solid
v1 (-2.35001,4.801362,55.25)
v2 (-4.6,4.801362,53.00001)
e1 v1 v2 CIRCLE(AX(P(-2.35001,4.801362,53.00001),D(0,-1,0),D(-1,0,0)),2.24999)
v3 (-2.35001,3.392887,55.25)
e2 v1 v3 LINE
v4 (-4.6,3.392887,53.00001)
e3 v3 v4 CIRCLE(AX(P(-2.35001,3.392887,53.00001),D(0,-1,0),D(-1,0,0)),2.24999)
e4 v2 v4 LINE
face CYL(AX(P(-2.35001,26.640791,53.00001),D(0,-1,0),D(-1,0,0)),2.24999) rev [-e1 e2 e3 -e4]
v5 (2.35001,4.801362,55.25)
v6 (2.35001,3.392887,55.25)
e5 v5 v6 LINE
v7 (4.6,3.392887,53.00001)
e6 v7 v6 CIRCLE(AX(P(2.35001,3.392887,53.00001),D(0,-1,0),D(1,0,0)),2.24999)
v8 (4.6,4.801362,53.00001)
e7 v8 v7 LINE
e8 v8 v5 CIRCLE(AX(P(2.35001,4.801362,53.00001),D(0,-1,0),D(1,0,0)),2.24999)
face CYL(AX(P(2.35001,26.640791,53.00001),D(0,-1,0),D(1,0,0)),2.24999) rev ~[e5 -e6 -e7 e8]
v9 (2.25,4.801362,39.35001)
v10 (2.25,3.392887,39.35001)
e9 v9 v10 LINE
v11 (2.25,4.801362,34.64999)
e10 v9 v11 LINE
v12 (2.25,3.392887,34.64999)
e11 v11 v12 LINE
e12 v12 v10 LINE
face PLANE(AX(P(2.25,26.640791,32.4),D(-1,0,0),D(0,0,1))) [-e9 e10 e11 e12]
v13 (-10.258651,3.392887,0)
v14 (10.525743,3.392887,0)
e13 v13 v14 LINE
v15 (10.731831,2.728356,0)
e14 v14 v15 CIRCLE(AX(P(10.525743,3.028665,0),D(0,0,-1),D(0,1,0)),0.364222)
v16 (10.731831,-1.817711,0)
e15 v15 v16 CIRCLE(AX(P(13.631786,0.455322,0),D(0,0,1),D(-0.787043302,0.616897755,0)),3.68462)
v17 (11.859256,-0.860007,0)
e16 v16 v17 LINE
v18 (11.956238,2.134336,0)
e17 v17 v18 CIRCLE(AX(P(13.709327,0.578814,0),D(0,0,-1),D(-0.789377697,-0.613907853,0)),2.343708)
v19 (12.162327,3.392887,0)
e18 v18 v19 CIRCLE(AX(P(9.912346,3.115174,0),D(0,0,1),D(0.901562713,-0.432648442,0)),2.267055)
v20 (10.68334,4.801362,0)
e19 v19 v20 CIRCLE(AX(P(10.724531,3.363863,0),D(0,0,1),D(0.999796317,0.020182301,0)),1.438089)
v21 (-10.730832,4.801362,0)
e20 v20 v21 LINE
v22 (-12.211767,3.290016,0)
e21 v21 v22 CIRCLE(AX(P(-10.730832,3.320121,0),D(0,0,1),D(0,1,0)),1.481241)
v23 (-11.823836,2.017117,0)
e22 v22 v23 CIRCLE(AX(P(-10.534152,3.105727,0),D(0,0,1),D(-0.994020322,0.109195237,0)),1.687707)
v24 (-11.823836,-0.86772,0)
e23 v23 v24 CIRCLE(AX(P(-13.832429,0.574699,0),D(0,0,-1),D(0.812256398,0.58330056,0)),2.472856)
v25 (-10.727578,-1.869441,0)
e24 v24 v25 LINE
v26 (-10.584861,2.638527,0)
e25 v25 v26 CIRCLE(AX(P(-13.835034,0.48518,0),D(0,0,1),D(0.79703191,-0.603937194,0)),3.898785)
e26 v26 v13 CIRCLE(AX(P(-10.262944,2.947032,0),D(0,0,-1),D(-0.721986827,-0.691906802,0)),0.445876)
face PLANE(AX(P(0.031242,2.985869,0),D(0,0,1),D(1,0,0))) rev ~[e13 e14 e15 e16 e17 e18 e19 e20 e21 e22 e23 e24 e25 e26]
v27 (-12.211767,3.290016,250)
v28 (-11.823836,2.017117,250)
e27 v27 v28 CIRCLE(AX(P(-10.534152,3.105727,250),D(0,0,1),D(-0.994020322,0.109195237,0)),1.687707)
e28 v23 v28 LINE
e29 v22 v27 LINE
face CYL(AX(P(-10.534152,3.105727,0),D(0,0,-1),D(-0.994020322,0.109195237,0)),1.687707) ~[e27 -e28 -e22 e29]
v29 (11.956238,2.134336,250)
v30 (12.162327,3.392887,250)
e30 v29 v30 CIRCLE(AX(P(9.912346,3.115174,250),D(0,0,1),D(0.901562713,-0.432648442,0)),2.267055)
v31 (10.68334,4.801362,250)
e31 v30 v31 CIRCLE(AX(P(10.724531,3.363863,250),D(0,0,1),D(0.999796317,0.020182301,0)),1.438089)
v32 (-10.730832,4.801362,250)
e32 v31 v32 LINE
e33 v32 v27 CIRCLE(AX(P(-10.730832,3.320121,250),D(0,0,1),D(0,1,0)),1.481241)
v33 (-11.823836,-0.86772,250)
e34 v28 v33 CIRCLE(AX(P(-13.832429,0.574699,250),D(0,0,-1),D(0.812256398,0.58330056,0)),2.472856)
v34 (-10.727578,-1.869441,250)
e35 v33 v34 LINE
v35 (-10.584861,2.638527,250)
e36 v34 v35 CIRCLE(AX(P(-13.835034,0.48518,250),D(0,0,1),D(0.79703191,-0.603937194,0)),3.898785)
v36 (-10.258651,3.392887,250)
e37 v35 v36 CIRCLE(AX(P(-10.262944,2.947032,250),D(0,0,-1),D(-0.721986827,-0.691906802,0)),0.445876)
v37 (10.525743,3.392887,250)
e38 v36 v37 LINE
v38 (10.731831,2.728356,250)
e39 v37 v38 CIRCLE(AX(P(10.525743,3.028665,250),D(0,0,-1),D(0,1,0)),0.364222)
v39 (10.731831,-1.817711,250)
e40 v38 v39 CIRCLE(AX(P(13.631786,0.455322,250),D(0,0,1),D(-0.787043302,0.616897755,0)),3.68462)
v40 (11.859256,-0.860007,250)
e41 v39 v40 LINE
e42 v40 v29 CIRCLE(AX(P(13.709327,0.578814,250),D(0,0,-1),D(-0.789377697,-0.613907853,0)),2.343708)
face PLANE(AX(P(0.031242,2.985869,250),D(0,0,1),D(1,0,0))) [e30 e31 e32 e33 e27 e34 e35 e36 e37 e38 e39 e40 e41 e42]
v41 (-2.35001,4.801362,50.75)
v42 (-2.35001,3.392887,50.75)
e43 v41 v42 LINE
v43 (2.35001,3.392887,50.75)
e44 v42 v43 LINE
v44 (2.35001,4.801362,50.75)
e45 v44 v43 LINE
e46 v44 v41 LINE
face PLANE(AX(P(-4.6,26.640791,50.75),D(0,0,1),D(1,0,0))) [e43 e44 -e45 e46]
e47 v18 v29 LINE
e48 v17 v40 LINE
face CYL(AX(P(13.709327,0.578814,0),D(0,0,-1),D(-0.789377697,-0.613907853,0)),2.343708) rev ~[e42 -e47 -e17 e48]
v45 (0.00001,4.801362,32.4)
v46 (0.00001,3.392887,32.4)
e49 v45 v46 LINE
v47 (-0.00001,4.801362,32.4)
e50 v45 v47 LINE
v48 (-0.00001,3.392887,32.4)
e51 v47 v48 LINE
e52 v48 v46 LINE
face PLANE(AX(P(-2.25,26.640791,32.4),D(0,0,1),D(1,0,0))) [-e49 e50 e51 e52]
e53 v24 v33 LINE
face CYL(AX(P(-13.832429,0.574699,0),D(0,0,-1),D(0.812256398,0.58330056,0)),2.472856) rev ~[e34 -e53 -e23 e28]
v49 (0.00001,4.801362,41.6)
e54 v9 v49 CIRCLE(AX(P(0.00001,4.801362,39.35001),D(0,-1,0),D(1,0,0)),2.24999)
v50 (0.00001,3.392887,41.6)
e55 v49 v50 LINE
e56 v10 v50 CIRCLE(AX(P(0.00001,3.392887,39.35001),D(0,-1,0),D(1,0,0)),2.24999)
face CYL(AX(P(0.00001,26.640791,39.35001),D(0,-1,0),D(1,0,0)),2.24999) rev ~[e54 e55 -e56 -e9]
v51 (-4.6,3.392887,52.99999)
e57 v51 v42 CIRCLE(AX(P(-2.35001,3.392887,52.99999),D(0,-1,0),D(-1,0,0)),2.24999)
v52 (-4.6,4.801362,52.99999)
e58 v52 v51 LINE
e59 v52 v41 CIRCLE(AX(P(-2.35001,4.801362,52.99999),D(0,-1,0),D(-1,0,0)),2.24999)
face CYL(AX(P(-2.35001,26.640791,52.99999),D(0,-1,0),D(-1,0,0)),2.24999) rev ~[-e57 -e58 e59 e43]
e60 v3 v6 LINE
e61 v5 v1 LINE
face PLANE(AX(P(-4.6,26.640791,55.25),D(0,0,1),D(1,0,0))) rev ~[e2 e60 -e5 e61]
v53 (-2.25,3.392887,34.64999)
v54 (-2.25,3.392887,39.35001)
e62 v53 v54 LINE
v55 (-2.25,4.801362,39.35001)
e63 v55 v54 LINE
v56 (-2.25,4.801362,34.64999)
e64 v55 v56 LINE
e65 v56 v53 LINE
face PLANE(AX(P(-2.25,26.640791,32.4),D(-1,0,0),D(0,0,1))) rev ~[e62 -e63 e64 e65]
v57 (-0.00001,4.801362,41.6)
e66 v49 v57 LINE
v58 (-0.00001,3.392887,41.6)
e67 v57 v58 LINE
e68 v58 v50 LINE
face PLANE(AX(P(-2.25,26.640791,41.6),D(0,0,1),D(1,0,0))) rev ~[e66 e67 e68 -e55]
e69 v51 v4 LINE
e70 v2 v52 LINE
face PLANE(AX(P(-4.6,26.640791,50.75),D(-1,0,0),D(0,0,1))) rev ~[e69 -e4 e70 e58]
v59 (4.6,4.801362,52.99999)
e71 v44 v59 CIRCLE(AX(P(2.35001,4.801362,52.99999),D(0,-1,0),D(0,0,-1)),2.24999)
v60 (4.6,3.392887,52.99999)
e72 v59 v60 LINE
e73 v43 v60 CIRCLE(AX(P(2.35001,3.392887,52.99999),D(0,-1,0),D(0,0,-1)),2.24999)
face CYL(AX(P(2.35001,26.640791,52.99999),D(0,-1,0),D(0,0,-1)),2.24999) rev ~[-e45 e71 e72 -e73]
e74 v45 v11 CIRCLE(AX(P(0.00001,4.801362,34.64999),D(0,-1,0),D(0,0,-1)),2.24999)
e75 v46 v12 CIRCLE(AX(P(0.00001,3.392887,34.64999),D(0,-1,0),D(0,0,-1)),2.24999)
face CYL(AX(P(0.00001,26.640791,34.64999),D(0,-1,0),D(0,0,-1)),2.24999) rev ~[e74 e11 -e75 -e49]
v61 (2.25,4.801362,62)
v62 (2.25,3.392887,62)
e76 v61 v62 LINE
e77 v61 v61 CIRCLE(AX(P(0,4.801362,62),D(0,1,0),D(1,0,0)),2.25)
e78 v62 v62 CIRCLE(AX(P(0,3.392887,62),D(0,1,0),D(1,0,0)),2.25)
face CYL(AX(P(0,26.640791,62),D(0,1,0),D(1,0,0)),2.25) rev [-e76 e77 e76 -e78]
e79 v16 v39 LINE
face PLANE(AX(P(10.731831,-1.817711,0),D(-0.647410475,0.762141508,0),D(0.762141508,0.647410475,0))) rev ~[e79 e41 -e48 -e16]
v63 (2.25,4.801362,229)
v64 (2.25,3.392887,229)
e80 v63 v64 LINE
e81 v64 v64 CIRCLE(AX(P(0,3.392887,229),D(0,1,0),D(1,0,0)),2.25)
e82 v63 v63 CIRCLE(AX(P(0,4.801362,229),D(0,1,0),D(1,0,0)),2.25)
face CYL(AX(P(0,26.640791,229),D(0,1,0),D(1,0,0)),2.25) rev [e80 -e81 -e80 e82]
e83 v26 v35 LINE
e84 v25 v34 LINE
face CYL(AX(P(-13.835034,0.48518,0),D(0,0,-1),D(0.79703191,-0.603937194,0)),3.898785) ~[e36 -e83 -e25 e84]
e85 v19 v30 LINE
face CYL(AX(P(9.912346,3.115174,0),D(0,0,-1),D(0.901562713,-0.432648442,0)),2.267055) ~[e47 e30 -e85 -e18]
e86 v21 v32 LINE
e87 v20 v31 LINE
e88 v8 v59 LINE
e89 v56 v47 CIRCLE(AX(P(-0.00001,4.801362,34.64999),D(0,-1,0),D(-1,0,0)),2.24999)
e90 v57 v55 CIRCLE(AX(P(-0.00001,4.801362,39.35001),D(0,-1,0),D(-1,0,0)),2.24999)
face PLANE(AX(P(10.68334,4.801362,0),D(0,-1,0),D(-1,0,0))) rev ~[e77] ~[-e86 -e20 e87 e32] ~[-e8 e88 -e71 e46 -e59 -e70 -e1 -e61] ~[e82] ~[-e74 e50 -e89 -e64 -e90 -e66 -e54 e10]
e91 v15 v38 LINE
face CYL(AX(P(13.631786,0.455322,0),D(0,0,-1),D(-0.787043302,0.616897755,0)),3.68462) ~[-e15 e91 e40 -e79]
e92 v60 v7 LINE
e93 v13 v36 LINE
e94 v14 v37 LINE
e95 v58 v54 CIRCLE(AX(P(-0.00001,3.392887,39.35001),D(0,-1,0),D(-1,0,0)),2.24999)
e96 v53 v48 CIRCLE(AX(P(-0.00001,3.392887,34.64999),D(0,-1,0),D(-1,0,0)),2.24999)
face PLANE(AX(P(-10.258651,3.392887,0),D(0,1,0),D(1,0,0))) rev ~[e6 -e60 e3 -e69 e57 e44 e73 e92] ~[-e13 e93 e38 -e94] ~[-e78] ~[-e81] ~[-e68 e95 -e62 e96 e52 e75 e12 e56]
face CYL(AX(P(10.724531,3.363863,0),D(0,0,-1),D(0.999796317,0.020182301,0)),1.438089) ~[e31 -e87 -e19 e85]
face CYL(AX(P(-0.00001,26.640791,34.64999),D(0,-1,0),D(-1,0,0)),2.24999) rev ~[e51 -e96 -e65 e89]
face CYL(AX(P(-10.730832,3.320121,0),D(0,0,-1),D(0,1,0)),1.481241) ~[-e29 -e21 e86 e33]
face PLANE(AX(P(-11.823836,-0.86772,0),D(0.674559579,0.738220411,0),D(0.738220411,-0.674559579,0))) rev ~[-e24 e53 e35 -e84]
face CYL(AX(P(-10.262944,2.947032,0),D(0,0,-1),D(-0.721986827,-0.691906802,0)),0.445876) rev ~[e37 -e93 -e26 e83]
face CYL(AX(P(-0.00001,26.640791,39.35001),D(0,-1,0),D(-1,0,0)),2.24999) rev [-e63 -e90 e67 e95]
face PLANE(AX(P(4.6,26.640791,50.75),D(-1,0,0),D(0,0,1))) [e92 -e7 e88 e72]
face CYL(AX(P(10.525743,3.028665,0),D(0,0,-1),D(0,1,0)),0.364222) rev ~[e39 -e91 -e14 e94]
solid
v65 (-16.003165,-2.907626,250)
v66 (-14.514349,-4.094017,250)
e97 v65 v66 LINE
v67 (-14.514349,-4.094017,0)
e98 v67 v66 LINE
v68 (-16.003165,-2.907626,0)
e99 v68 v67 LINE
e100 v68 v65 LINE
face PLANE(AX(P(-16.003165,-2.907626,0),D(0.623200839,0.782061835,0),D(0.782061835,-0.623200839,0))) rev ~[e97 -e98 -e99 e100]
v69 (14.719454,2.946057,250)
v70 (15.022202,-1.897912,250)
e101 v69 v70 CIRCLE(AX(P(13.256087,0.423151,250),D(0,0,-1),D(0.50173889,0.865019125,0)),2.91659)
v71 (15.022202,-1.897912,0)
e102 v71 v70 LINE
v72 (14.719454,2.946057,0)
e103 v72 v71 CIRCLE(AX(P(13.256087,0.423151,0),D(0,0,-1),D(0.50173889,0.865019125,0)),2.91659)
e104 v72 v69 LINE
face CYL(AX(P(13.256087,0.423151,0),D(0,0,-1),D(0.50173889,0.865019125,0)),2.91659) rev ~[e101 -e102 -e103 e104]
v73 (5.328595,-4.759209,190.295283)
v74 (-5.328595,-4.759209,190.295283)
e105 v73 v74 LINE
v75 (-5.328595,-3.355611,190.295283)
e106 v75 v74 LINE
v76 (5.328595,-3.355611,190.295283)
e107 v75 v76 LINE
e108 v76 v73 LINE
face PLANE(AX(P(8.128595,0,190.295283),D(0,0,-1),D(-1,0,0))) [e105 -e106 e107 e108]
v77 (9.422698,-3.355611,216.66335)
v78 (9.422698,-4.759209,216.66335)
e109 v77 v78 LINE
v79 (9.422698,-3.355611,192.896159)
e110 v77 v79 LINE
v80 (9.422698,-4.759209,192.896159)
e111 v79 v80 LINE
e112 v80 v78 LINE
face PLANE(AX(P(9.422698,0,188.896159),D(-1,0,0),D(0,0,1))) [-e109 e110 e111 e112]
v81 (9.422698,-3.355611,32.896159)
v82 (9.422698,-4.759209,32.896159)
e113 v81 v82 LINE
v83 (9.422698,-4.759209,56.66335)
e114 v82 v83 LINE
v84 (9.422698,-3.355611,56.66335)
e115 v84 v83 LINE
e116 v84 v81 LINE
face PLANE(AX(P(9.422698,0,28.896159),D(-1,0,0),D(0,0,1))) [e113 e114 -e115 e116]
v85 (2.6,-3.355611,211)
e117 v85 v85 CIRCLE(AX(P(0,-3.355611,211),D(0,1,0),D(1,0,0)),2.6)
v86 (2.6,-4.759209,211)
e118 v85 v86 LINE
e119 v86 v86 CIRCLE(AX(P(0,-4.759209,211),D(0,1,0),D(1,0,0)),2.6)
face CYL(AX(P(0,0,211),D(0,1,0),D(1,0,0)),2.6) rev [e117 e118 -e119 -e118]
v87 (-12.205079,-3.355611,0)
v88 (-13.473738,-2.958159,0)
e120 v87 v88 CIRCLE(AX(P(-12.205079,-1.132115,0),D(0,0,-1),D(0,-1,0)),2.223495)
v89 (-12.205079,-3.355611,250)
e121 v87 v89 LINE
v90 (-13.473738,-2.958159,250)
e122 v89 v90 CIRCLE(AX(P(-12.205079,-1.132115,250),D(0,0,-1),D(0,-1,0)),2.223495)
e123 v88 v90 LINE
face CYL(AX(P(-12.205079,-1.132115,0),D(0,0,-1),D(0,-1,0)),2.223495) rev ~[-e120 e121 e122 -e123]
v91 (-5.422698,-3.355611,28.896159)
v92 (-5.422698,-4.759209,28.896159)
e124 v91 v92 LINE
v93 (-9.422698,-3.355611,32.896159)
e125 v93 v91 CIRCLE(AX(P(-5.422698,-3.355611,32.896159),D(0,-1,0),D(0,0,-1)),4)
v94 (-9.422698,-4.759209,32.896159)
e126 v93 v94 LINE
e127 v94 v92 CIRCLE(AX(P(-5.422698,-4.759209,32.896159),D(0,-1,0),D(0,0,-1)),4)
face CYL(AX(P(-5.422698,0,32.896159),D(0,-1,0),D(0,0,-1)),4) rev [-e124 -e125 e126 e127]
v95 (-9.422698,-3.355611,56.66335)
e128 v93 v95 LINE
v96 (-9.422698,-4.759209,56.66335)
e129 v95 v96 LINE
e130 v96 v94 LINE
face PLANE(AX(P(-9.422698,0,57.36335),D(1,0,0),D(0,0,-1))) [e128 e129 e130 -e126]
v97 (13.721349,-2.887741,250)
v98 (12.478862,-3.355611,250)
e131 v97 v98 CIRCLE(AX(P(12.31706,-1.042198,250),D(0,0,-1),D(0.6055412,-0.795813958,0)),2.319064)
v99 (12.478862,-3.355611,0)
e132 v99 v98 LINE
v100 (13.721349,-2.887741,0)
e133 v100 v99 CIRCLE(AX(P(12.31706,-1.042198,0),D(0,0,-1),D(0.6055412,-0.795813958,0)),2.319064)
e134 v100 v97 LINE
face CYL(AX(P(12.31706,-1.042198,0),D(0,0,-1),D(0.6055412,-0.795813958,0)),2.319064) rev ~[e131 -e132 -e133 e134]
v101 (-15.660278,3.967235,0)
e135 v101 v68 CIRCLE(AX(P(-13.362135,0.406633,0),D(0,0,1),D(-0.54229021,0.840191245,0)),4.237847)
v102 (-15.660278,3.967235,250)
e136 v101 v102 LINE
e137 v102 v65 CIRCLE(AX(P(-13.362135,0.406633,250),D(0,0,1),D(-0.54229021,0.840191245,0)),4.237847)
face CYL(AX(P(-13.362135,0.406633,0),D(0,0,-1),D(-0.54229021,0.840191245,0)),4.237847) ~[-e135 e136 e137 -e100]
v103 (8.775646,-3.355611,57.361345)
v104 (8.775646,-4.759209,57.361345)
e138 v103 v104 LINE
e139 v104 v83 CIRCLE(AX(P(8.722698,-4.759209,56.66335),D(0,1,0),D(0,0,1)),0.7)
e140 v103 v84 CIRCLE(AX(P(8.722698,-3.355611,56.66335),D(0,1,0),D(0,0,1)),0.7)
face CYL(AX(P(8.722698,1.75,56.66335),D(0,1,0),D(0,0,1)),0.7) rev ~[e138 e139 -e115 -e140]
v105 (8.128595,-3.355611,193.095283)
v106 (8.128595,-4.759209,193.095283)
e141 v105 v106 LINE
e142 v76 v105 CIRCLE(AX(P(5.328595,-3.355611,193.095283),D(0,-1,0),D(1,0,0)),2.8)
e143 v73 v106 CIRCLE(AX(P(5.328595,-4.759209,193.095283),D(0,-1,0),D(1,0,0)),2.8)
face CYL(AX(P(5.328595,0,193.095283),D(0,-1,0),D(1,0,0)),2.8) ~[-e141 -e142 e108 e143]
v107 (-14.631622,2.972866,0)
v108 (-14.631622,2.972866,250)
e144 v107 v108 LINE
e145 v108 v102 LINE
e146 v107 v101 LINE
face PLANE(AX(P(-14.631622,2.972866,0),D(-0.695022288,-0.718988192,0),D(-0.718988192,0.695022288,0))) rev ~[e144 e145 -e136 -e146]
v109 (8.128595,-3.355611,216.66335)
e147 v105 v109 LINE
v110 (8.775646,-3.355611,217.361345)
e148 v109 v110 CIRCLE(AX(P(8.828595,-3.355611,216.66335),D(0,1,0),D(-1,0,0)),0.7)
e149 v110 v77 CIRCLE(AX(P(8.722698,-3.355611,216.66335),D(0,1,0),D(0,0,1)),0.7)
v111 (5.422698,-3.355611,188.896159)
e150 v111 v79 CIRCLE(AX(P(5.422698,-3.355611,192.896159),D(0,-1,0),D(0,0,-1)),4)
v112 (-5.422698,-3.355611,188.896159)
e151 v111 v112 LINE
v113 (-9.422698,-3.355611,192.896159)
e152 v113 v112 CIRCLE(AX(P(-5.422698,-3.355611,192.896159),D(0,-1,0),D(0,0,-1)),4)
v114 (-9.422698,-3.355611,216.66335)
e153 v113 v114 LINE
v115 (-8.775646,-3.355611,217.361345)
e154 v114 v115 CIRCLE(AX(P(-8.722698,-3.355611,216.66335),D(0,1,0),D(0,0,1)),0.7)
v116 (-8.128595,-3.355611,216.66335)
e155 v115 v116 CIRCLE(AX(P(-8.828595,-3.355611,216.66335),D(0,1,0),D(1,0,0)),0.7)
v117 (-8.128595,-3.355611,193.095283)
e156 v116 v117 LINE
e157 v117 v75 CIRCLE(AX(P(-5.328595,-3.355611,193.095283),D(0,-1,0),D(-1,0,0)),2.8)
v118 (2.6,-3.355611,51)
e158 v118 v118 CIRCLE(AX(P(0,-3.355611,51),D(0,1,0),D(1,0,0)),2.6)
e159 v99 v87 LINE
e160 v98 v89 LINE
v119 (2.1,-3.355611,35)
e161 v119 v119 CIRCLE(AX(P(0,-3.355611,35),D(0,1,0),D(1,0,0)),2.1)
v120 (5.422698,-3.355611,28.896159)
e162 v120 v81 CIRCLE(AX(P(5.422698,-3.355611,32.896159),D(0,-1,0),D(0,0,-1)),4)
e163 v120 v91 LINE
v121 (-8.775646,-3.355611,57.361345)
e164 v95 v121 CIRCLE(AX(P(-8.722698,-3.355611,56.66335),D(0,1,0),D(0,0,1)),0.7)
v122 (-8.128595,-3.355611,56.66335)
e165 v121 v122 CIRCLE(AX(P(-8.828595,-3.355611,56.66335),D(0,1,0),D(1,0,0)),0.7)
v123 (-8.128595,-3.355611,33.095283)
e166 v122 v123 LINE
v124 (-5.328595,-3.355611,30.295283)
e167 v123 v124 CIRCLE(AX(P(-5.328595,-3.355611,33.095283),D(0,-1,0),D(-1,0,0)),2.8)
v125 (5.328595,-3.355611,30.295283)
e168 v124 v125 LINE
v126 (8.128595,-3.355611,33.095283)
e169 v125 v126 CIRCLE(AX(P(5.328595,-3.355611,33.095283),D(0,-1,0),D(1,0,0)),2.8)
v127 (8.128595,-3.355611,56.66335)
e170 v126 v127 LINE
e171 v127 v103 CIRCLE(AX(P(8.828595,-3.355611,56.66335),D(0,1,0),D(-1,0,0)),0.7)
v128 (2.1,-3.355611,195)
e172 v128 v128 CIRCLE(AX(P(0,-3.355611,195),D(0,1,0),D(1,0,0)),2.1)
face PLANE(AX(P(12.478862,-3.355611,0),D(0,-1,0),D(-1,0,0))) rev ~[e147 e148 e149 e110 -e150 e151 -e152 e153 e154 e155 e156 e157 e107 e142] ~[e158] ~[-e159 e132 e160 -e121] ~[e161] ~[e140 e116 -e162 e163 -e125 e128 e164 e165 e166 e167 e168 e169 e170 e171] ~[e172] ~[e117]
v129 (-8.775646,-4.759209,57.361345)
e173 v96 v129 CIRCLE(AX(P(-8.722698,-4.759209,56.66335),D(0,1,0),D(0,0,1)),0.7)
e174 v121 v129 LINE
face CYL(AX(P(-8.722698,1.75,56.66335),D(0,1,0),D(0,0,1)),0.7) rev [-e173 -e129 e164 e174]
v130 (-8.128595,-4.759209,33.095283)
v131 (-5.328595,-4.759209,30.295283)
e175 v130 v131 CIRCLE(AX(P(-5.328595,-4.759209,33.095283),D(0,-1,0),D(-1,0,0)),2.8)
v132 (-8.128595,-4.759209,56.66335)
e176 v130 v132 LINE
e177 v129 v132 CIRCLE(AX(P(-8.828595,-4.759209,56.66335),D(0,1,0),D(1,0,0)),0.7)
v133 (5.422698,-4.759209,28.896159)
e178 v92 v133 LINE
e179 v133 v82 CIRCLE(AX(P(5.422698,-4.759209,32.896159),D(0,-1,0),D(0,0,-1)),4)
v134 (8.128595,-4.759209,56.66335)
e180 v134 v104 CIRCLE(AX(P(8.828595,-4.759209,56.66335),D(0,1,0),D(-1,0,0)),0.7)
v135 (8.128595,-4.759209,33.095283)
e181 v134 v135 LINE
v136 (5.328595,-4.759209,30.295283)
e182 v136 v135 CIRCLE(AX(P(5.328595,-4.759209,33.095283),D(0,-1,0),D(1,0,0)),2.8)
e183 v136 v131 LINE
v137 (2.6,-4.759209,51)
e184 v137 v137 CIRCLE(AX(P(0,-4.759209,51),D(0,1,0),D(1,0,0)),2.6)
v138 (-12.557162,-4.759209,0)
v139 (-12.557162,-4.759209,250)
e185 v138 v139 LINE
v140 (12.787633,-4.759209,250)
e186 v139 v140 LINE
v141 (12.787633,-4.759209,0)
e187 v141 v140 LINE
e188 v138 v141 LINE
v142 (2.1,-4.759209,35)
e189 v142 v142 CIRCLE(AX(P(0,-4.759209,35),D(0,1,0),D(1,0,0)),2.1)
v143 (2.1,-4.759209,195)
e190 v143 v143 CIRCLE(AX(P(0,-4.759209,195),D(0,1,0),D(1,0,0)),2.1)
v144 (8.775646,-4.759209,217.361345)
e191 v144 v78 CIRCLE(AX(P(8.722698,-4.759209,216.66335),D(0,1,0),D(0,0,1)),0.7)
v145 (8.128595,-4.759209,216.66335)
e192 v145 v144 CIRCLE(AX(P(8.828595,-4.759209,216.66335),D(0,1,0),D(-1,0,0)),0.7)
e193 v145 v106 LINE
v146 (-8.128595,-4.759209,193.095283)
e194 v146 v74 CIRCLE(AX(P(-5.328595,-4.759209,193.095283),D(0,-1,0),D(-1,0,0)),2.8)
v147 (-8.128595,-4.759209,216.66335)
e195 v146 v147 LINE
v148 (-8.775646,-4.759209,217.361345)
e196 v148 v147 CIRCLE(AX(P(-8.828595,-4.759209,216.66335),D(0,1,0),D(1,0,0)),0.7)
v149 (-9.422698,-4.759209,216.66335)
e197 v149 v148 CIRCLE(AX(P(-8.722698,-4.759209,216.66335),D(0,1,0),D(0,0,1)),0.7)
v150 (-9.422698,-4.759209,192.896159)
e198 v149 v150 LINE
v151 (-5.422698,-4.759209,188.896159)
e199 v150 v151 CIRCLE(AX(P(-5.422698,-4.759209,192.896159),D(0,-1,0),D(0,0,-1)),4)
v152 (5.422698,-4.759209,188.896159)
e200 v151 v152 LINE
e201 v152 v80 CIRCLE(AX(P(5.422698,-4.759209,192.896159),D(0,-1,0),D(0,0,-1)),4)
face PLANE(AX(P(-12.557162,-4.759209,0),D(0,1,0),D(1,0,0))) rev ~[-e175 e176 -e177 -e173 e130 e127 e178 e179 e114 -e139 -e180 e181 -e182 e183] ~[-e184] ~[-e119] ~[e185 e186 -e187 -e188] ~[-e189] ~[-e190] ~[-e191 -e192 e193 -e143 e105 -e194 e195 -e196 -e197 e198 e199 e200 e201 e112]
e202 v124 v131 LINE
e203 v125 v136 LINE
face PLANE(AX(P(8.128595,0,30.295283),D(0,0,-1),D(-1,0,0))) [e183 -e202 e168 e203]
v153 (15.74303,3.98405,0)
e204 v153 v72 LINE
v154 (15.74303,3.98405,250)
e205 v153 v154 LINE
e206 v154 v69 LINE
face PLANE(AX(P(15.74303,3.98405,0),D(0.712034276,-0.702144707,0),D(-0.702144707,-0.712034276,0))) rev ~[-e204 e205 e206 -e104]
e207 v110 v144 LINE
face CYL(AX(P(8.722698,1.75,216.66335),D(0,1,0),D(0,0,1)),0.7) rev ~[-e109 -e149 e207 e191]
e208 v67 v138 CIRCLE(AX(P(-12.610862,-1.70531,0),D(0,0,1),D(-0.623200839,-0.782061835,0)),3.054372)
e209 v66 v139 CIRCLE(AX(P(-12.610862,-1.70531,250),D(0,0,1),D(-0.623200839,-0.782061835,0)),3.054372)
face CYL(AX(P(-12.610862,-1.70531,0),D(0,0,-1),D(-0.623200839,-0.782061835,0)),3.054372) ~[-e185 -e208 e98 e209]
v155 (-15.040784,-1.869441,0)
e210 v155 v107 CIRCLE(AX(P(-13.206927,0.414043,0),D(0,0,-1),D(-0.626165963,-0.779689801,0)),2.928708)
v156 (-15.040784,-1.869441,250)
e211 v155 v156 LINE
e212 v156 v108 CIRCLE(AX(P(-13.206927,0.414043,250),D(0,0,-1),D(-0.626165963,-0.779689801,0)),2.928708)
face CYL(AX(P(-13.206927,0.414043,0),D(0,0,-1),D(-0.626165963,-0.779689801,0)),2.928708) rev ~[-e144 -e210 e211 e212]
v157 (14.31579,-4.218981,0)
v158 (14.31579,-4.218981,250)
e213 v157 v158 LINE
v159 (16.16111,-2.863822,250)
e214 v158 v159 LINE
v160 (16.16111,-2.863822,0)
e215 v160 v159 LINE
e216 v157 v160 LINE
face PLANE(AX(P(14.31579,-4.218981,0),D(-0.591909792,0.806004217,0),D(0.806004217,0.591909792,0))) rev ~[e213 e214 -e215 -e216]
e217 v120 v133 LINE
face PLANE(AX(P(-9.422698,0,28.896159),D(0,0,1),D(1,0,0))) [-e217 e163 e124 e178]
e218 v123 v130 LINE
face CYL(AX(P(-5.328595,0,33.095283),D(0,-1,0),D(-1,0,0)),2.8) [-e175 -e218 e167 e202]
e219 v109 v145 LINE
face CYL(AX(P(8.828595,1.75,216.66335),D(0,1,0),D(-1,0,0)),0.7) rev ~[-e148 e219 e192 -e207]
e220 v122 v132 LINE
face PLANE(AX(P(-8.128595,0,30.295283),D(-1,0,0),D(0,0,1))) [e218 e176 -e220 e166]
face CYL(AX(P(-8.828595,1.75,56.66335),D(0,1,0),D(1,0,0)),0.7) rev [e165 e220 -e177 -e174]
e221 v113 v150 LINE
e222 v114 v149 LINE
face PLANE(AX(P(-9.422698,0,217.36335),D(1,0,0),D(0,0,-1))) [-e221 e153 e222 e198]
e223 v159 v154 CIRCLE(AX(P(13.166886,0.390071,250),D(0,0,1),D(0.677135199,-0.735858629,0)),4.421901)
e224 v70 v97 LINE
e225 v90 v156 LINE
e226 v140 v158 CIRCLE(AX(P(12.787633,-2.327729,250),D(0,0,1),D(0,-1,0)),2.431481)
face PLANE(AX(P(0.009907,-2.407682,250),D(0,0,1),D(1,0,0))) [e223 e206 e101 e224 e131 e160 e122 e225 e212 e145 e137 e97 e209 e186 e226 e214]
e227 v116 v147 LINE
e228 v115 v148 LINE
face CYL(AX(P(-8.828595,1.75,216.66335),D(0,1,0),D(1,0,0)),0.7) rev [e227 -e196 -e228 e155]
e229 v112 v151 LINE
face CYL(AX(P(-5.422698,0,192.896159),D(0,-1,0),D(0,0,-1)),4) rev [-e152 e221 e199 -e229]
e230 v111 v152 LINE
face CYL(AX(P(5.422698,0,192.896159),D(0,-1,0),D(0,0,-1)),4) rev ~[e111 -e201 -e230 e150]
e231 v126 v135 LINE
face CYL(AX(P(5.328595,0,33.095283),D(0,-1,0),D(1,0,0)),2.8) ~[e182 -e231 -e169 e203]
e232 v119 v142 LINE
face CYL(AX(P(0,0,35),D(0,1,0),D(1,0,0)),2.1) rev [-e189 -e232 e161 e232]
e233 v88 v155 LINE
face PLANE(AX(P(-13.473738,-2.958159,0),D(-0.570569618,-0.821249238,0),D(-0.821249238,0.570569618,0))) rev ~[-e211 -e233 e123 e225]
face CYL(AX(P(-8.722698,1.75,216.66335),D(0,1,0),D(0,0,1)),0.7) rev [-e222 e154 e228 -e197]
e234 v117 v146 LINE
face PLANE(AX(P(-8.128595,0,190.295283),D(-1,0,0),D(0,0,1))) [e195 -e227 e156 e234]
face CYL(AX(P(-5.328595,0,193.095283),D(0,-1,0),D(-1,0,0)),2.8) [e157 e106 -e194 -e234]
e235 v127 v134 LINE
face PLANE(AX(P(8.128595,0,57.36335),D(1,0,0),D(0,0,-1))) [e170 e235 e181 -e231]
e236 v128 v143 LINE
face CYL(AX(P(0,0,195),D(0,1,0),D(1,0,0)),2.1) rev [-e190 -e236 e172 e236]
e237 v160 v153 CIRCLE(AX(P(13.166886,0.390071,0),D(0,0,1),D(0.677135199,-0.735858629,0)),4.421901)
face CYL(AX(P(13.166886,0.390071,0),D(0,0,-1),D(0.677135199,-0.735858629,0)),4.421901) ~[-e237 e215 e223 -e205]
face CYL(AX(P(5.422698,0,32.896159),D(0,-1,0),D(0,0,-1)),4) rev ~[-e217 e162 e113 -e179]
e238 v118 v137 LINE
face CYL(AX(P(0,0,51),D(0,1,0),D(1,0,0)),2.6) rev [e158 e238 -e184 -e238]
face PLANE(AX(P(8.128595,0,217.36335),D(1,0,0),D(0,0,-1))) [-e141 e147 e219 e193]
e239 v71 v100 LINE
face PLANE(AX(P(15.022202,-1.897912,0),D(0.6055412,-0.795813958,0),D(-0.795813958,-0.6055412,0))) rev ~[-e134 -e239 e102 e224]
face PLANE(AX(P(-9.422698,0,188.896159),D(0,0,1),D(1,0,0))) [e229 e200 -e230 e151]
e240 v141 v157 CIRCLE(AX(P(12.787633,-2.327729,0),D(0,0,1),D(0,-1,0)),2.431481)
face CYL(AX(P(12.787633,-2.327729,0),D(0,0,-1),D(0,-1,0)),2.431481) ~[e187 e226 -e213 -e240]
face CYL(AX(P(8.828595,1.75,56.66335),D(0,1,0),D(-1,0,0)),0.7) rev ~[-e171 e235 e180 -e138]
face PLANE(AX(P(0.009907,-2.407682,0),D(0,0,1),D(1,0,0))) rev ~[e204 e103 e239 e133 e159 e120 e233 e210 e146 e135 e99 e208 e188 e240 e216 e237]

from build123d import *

# Parameters (mm, degrees)
F2_DEPTH     = 250
F3_DEPTH     = 250
F4_W         = 4.5
F4_H         = 9.2
F5_DEPTH     = 25
F4_W_2       = 9.2
F4_H_2       = 4.5
F4_R         = 2.25
F8_R         = 2.24999
F8_2_R       = 2.24999
F14_DEPTH    = 6
F13_R        = 2.1
F13_R_2      = 2.6
F15_R        = 4
F16_R        = 2.8
F17_T1_DEPTH = 9.5


# Not quite as in the source:
# - a fillet or chamfer that OpenCascade refuses, or shapes differently, is made with other operations: its cross-section is extruded or revolved along the edge and cut away or added
# - a fillet or chamfer is up to 0.001 mm smaller than in the source, because OpenCascade refuses the exact size


with BuildPart() as f2:
    # F1 (on Top) → F2 (new body)
    with BuildSketch(Plane.XY):
        with BuildLine():
            Line((-11.8238357827, -0.8677195292), (-10.7275778428, -1.8694410791))
            ThreePointArc((-10.7275778428, -1.8694410791), (-9.9382011717, 0.3618114698), (-10.5848610401, 2.6385271922))
            ThreePointArc((-10.5848610401, 2.6385271922), (-10.6721948967, 3.1240050413), (-10.2586513385, 3.3928873017))
            Line((-10.2586513385, 3.3928873017), (10.5257425457, 3.3928873017))
            ThreePointArc((10.5257425457, 3.3928873017), (10.8736199043, 3.1365507058), (10.731831193, 2.7283558156))
            ThreePointArc((10.731831193, 2.7283558156), (9.9471667751, 0.455322268), (10.731831193, -1.8177112797))
            Line((10.731831193, -1.8177112797), (11.8592558429, -0.8600065485))
            ThreePointArc((11.8592558429, -0.8600065485), (11.3668469211, 0.6546838766), (11.9562381878, 2.1343363915))
            ThreePointArc((11.9562381878, 2.1343363915), (12.1496041237, 2.7488216154), (12.1623268351, 3.3928873017))
            ThreePointArc((12.1623268351, 3.3928873017), (11.7162853066, 4.4052676185), (10.6833400205, 4.8013622873))
            Line((10.6833400205, 4.8013622873), (-10.7308318838, 4.8013622873))
            ThreePointArc((-10.7308318838, 4.8013622873), (-11.7888176914, 4.3568184571), (-12.2117670253, 3.2900162041))
            ThreePointArc((-12.2117670253, 3.2900162041), (-12.1485508104, 2.6137193167), (-11.8238357827, 2.0171173383))
            ThreePointArc((-11.8238357827, 2.0171173383), (-11.3595728447, 0.5746989045), (-11.8238357827, -0.8677195292))
        make_face()
    extrude(amount=F2_DEPTH)


with BuildPart() as f3:
    # F1 (on Top) → F3 (new body)
    with BuildSketch(Plane.XY):
        with BuildLine():
            ThreePointArc((-15.040784136, -1.8694410791), (-16.1252354526, 0.6606326234), (-14.6316215396, 2.9728664085))
            Line((-14.6316215396, 2.9728664085), (-15.6602784991, 3.9672353305))
            ThreePointArc((-15.6602784991, 3.9672353305), (-17.5947215903, 0.617735278), (-16.0031653941, -2.9076256324))
            Line((-16.0031653941, -2.9076256324), (-14.5143490806, -4.0940172111))
            ThreePointArc((-14.5143490806, -4.0940172111), (-13.5937394916, -4.5972187997), (-12.5571619719, -4.7592092305))
            Line((-12.5571619719, -4.7592092305), (12.7876326442, -4.7592092305))
            ThreePointArc((12.7876326442, -4.7592092305), (13.5980508192, -4.6201771633), (14.3157895654, -4.21898067))
            Line((14.3157895654, -4.21898067), (16.1611102521, -2.863822272))
            ThreePointArc((16.1611102521, -2.863822272), (17.5805681578, 0.6595379776), (15.7430302352, 3.9840503596))
            Line((15.7430302352, 3.9840503596), (14.7194536403, 2.9460568912))
            ThreePointArc((14.7194536403, 2.9460568912), (16.1669970409, 0.6050832532), (15.0222023949, -1.8979118904))
            Line((15.0222023949, -1.8979118904), (13.7213492466, -2.8877414463))
            ThreePointArc((13.7213492466, -2.8877414463), (13.1343028227, -3.2124911979), (12.4788619578, -3.35561065))
            Line((12.4788619578, -3.35561065), (-12.2050791979, -3.35561065))
            ThreePointArc((-12.2050791979, -3.35561065), (-12.8698089882, -3.2539225108), (-13.4737379849, -2.9581591953))
            Line((-13.4737379849, -2.9581591953), (-15.040784136, -1.8694410791))
        make_face()
    extrude(amount=F3_DEPTH)


with BuildPart() as f5:
    # F4 (on face) → F5 (new body)
    with BuildSketch(Plane.XZ.offset(4.7592092305)):
        with Locations((0, 37)):
            Rectangle(F4_W, F4_H)
    extrude(amount=F5_DEPTH)


with BuildPart() as f5b:
    # F4 (on face) → F5, piece 2 (new body)
    with BuildSketch(Plane.XZ.offset(4.7592092305)):
        with Locations((0, 53)):
            Rectangle(F4_W_2, F4_H_2)
    extrude(amount=F5_DEPTH)


with BuildPart() as f5c:
    # F4 (on face) → F5, piece 3 (new body)
    with BuildSketch(Plane.XZ.offset(4.7592092305)):
        with Locations((0, 62)):
            Circle(F4_R)
    extrude(amount=F5_DEPTH)


with BuildPart() as f5d:
    # F4 (on face) → F5, piece 4 (new body)
    with BuildSketch(Plane.XZ.offset(4.7592092305)):
        with Locations((0, 229)):
            Circle(F4_R)
    extrude(amount=F5_DEPTH)


with BuildPart() as f5d_1:
    # F6: moved
    add(f5d.part.moved(Location((0, 29, 0))))


with BuildPart() as f5c_1:
    # F6: moved
    add(f5c.part.moved(Location((0, 29, 0))))


with BuildPart() as f5b_1:
    # F6: moved
    add(f5b.part.moved(Location((0, 29, 0))))


with BuildPart() as f5_1:
    # F6: moved
    add(f5.part.moved(Location((0, 29, 0))))


with BuildPart() as f5d_2:
    # F7: moved
    add(f5d_1.part.moved(Location((0, 2.4, 0))))


with BuildPart() as f5c_2:
    # F7: moved
    add(f5c_1.part.moved(Location((0, 2.4, 0))))


with BuildPart() as f5b_2:
    # F7: moved
    add(f5b_1.part.moved(Location((0, 2.4, 0))))

    # F8 (radius 2.25 in the source; OpenCascade refuses exactly that, so slightly less here)
    f8_edges = [f5b_2.edges().sort_by_distance(p)[0] for p in [
        (-4.6, 14.140791, 50.75),
        (4.6, 14.140791, 50.75),
        (-4.6, 14.140791, 55.25),
        (4.6, 14.140791, 55.25),
    ]]
    fillet(f8_edges, radius=F8_R)


with BuildPart() as f5_2:
    # F7: moved
    add(f5_1.part.moved(Location((0, 2.4, 0))))

    # F8#2 (radius 2.25 in the source; OpenCascade refuses exactly that, so slightly less here)
    f8_2_edges = [f5_2.edges().sort_by_distance(p)[0] for p in [
        (-2.25, 14.140791, 41.6),
        (-2.25, 14.140791, 32.4),
        (2.25, 14.140791, 32.4),
        (2.25, 14.140791, 41.6),
    ]]
    fillet(f8_2_edges, radius=F8_2_R)


with BuildPart() as f2_1:
    add(f2.part)

    # F9: cut F5
    add(f5_2.part, mode=Mode.SUBTRACT)

    # F10: cut F5d
    add(f5d_2.part, mode=Mode.SUBTRACT)

    # F11: cut F5b
    add(f5b_2.part, mode=Mode.SUBTRACT)

    # F12: cut F5c
    add(f5c_2.part, mode=Mode.SUBTRACT)


with BuildPart() as f14:
    # F13 (on Front) → F14 (new body)
    with BuildSketch(Plane.XZ):
        Polygon((-9.4226980582, 28.8961585611), (0, 28.8961585611), (0, 30.2952826023), (-8.1285946071, 30.2952826023), (-8.1285946071, 57.3633499444), (-9.4226980582, 57.3633499444), align=None)
        Polygon((0, 30.2952826023), (0, 28.8961585611), (9.4226980582, 28.8961585611), (9.4226980582, 57.3633499444), (8.1285946071, 57.3633499444), (8.1285946071, 30.2952826023), align=None)
    extrude(amount=F14_DEPTH)

    # F15
    f15_edges = [f14.edges().sort_by_distance(p)[0] for p in [
        (9.422698, -3, 28.896159),
        (-9.422698, -3, 28.896159),
    ]]
    fillet(f15_edges, radius=F15_R)

    # F16
    f16_edges = [f14.edges().sort_by_distance(p)[0] for p in [
        (-8.128595, -3, 30.295283),
        (8.128595, -3, 30.295283),
    ]]
    fillet(f16_edges, radius=F16_R)

    # F17: fillet of radius 0.7 on 4 edges, made by hand

    # F17_s2 → F17_t1 (cut)
    with BuildSketch(Plane.XZ.offset(-1.75)):
        with BuildLine():
            ThreePointArc((-8.1285946071, 56.6633499444), (-8.3336198603, 57.1583246912), (-8.8285946071, 57.3633499444))
            Line((-8.8285946071, 57.3633499444), (-8.1285946071, 57.3633499444))
            Line((-8.1285946071, 57.3633499444), (-8.1285946071, 56.6633499444))
        make_face()
        with BuildLine():
            ThreePointArc((-8.7226980582, 57.3633499444), (-9.217672805, 57.1583246912), (-9.4226980582, 56.6633499444))
            Line((-9.4226980582, 56.6633499444), (-9.4226980582, 57.3633499444))
            Line((-9.4226980582, 57.3633499444), (-8.7226980582, 57.3633499444))
        make_face()
        with BuildLine():
            ThreePointArc((8.1285946071, 56.6633499444), (8.3336198603, 57.1583246912), (8.8285946071, 57.3633499444))
            Line((8.8285946071, 57.3633499444), (8.1285946071, 57.3633499444))
            Line((8.1285946071, 57.3633499444), (8.1285946071, 56.6633499444))
        make_face()
        with BuildLine():
            ThreePointArc((8.7226980582, 57.3633499444), (9.217672805, 57.1583246912), (9.4226980582, 56.6633499444))
            Line((9.4226980582, 56.6633499444), (9.4226980582, 57.3633499444))
            Line((9.4226980582, 57.3633499444), (8.7226980582, 57.3633499444))
        make_face()
    extrude(amount=F17_T1_DEPTH, mode=Mode.SUBTRACT)


with BuildPart() as f14b:
    # F13 (on Front) → F14, piece 2 (new body)
    with BuildSketch(Plane.XZ):
        with Locations((0, 35)):
            Circle(F13_R)
    extrude(amount=F14_DEPTH)


with BuildPart() as f14c:
    # F13 (on Front) → F14, piece 3 (new body)
    with BuildSketch(Plane.XZ):
        with Locations((0, 51)):
            Circle(F13_R_2)
    extrude(amount=F14_DEPTH)


with BuildPart() as f18_1:
    # F18: copy of F14b
    add(f14b.part.moved(Location((0, 0, 97))))


with BuildPart() as f18_2:
    # F18: copy of F14c
    add(f14c.part.moved(Location((0, 0, 97))))


with BuildPart() as f18_3:
    # F18: copy of F14
    add(f14.part.moved(Location((0, 0, 97))))


with BuildPart() as f18_2_1:
    # F19: moved
    add(f18_2.part.moved(Location((0, 0, 63))))


with BuildPart() as f18_1_1:
    # F19: moved
    add(f18_1.part.moved(Location((0, 0, 63))))


with BuildPart() as f18_3_1:
    # F19: moved
    add(f18_3.part.moved(Location((0, 0, 63))))


with BuildPart() as f3_1:
    add(f3.part)

    # F20: cut F18_1, F14, F14c, F18_2, F18_3, F14b
    add(f18_1_1.part, mode=Mode.SUBTRACT)
    add(f14.part, mode=Mode.SUBTRACT)
    add(f14c.part, mode=Mode.SUBTRACT)
    add(f18_2_1.part, mode=Mode.SUBTRACT)
    add(f18_3_1.part, mode=Mode.SUBTRACT)
    add(f14b.part, mode=Mode.SUBTRACT)


solid = Compound([f2_1.part, f3_1.part])
